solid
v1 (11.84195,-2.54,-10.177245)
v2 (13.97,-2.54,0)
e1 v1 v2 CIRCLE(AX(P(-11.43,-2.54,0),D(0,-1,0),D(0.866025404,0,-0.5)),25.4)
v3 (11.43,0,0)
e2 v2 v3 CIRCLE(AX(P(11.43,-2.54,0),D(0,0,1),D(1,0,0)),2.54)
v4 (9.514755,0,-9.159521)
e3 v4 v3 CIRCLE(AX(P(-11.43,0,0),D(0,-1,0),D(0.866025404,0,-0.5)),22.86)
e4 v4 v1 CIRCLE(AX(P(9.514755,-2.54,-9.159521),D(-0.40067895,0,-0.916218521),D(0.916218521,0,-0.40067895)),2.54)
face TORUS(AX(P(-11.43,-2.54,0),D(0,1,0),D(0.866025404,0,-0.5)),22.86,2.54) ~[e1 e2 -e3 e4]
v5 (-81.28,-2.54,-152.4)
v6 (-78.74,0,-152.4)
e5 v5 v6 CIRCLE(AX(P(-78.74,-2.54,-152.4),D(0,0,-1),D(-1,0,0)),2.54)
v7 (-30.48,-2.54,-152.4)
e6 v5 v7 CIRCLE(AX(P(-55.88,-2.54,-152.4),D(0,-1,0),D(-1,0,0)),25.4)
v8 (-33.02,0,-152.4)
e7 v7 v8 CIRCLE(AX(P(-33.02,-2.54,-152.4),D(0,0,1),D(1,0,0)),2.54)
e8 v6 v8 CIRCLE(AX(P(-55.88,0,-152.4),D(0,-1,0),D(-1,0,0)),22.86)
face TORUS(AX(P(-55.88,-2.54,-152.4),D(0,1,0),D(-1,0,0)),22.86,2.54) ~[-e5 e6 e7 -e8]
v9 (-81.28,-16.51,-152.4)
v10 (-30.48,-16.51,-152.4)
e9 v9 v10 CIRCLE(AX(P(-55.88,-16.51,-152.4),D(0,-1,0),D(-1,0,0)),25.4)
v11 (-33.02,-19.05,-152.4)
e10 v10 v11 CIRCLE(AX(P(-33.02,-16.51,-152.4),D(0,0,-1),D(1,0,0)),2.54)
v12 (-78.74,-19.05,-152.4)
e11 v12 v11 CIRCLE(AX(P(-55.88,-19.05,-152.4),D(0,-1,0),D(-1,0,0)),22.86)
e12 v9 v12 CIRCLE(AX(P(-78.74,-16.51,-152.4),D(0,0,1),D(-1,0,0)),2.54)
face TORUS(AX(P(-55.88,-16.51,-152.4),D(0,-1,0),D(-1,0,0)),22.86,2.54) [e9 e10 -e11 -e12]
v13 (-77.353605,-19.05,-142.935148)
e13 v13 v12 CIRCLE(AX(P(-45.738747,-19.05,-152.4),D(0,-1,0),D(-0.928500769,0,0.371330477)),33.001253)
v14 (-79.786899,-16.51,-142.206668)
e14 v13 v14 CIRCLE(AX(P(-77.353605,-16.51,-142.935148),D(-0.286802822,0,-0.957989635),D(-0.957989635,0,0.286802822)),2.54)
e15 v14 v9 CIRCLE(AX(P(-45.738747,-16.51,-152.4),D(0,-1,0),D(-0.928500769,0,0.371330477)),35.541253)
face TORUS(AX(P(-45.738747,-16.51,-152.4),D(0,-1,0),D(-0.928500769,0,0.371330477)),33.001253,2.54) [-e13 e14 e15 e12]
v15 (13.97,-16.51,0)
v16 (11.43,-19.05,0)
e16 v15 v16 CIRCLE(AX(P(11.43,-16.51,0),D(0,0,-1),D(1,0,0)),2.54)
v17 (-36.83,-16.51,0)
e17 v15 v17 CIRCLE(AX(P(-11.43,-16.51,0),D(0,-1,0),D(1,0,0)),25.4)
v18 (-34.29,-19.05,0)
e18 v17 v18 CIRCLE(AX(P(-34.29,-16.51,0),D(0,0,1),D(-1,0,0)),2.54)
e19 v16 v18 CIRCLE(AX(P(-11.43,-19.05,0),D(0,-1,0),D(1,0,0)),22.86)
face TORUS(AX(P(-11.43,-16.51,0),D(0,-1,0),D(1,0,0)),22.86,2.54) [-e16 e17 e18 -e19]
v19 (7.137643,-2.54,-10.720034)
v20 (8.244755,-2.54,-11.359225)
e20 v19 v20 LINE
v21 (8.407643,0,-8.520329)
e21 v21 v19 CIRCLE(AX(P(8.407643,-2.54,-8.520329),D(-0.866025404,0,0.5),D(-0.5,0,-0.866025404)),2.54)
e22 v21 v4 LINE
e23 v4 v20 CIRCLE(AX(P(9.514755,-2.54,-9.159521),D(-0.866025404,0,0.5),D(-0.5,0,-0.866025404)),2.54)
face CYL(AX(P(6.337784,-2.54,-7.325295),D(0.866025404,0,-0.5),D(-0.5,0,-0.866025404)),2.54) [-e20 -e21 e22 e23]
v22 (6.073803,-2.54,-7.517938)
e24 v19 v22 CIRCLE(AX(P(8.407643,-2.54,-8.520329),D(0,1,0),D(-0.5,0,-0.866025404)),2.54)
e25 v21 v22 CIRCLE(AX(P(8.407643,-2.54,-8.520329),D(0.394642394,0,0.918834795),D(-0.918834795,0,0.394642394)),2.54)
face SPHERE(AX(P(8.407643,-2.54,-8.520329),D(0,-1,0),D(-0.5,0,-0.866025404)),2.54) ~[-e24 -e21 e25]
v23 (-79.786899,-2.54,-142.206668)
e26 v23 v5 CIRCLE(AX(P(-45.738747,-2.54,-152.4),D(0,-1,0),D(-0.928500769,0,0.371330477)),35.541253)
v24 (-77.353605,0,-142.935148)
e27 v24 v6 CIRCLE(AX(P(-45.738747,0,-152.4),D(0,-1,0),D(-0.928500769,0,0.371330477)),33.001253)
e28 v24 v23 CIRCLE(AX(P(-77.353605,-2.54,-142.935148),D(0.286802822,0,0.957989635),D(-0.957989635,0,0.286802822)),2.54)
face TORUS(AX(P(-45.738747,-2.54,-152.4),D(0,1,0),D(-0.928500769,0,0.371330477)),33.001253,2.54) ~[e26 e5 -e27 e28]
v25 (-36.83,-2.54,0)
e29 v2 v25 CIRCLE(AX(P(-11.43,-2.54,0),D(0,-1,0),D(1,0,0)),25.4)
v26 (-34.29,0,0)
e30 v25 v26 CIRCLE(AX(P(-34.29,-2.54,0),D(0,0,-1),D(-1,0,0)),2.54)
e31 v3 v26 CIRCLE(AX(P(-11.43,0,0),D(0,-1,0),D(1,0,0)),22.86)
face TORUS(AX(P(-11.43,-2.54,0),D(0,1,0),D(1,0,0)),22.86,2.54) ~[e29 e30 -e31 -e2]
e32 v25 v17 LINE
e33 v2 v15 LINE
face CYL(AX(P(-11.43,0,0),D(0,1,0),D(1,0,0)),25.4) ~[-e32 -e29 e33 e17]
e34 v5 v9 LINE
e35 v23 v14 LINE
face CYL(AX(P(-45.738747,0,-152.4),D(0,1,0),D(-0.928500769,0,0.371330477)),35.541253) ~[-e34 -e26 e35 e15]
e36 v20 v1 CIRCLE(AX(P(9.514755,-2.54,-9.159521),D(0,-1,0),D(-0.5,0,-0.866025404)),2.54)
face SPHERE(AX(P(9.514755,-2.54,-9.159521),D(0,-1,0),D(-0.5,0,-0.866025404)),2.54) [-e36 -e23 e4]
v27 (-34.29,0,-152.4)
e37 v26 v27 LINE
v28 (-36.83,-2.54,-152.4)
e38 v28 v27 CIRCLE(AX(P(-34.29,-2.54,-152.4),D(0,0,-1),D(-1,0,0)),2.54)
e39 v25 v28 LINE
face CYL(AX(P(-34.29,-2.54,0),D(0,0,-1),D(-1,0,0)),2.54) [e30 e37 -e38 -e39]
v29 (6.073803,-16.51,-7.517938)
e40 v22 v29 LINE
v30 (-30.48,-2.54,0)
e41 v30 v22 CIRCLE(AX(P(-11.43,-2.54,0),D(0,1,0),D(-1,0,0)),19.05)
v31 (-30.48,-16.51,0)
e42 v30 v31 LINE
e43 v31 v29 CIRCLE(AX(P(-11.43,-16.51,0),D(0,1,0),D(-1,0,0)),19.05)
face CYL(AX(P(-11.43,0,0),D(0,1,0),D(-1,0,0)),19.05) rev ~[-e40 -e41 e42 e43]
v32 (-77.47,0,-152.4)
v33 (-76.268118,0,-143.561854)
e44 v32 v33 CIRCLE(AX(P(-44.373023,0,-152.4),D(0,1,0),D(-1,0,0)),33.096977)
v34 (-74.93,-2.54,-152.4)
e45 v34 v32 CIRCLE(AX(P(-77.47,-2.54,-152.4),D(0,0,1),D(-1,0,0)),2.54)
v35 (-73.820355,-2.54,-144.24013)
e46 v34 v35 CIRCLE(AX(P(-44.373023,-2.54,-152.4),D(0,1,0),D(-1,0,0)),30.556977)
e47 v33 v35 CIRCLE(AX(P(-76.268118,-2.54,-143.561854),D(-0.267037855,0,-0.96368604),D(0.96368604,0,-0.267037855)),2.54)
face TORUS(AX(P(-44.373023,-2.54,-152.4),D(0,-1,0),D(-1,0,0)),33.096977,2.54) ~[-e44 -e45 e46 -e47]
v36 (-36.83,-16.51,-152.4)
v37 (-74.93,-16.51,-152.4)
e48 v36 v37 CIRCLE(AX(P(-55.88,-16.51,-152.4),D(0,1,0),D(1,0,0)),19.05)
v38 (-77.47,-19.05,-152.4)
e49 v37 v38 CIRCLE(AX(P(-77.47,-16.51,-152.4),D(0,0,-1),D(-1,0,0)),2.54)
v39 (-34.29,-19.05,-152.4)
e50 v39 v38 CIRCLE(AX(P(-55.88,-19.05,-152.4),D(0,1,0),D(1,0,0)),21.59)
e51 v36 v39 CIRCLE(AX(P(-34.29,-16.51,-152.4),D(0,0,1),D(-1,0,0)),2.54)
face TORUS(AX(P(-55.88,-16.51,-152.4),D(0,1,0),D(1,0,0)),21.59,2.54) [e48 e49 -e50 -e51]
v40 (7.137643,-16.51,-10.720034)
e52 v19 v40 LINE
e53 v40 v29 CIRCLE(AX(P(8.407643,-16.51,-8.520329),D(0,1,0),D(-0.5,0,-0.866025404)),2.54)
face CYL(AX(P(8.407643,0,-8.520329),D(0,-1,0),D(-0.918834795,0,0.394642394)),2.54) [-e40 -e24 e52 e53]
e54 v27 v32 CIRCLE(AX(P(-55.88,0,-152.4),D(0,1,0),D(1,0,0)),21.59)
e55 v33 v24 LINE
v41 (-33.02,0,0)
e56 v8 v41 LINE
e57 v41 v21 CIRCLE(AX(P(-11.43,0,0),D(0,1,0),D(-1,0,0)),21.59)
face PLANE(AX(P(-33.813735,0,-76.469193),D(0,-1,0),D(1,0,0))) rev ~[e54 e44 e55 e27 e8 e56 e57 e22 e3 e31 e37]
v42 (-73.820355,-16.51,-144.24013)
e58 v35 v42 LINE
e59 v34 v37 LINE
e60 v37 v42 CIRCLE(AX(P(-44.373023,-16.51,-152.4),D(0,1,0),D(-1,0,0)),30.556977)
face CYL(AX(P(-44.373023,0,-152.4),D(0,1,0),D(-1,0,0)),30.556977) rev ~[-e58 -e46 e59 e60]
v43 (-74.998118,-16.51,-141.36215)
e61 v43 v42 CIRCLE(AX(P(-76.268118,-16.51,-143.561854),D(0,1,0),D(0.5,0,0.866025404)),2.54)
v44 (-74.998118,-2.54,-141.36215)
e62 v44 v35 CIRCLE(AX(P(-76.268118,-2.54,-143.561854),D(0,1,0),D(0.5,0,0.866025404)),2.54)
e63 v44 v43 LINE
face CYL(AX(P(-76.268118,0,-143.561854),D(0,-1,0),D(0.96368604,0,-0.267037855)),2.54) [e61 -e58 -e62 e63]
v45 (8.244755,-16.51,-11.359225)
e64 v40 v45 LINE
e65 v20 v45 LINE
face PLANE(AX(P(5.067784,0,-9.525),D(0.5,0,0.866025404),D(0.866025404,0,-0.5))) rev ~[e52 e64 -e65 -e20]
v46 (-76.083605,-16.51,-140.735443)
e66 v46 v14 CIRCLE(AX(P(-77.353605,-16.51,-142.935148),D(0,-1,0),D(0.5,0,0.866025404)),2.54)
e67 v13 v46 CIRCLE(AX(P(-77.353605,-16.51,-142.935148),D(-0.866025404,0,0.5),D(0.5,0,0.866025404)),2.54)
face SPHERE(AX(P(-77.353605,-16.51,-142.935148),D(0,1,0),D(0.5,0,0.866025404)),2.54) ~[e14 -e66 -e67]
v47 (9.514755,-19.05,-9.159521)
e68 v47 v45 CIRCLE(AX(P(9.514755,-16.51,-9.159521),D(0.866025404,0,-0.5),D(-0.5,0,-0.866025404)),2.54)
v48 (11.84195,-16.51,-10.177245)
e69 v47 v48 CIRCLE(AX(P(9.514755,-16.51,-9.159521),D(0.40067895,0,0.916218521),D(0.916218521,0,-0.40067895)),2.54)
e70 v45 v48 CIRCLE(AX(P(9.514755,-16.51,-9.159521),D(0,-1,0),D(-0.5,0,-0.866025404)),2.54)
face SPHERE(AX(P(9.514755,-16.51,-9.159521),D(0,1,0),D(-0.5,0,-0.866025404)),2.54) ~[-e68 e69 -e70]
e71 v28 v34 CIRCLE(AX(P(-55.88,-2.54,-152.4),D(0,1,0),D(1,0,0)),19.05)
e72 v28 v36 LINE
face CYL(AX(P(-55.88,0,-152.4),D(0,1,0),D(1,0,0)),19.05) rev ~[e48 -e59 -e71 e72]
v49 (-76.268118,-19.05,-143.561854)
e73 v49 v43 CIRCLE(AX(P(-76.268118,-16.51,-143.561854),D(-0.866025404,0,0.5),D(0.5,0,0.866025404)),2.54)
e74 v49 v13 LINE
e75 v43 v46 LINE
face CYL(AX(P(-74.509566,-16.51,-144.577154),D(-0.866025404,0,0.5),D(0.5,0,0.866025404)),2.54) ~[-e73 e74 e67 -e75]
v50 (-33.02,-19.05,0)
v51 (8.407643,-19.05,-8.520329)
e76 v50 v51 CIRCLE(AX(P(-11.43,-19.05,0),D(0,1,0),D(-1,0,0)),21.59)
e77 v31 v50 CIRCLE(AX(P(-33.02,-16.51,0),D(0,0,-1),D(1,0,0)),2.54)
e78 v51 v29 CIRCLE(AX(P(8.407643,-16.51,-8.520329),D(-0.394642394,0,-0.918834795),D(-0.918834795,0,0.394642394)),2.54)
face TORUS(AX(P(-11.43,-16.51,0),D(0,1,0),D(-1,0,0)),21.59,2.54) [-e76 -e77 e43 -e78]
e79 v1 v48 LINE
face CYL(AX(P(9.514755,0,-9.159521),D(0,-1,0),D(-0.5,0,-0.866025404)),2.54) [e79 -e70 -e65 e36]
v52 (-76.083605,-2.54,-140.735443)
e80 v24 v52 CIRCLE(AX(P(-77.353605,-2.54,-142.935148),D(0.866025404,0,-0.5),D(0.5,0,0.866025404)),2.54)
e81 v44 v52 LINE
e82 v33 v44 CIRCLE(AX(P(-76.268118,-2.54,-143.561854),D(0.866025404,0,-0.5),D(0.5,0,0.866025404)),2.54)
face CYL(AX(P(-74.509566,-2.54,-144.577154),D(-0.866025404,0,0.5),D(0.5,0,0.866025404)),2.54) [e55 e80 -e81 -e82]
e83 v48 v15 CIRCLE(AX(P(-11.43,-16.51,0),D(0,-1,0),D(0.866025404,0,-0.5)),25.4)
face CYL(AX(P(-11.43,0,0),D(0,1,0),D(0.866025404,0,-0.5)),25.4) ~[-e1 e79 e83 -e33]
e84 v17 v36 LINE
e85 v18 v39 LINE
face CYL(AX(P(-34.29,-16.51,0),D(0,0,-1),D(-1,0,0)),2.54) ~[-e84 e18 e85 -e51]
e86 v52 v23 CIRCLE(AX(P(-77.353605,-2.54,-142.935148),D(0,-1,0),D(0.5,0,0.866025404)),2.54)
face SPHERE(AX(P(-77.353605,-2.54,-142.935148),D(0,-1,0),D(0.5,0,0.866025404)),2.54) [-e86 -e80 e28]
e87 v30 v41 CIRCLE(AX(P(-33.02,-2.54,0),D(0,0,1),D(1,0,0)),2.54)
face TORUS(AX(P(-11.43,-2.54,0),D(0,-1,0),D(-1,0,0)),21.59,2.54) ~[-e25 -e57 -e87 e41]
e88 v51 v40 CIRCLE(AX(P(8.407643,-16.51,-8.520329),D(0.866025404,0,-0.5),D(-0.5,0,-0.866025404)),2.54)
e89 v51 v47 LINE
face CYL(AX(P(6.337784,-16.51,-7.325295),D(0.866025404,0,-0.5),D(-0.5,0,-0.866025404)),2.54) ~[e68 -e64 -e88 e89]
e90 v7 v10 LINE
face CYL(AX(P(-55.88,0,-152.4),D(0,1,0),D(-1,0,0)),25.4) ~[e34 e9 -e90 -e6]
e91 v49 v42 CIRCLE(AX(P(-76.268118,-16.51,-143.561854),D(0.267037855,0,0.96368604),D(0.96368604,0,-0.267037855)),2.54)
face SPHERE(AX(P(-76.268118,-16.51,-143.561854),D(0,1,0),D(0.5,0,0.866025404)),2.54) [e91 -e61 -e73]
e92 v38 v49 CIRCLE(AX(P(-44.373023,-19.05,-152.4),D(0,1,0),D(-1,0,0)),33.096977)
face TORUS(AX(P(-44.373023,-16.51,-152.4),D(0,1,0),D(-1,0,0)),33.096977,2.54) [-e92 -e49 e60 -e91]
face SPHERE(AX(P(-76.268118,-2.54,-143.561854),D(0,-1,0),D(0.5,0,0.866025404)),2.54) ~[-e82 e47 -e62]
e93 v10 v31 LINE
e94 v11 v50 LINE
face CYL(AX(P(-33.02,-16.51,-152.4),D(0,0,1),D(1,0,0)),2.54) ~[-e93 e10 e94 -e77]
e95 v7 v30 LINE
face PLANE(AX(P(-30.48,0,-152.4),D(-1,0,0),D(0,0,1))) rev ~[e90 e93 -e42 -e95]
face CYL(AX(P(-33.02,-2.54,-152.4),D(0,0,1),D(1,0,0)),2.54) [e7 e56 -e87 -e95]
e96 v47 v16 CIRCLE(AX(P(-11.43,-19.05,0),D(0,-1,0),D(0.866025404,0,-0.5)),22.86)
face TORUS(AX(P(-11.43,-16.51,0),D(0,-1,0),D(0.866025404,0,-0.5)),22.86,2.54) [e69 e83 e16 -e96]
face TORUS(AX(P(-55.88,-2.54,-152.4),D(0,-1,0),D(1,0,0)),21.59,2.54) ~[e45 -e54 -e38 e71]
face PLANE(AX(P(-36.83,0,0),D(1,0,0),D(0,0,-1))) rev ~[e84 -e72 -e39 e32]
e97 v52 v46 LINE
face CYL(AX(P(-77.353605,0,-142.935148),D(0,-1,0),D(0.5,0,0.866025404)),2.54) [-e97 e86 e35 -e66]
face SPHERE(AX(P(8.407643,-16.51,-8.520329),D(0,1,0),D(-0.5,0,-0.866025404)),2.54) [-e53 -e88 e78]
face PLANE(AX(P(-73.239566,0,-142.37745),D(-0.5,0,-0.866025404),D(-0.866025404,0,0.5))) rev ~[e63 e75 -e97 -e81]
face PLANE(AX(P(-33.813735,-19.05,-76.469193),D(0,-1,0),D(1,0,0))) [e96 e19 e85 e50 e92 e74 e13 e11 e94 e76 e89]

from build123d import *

# Parameters (mm, degrees)
F1_DEPTH = 19.05
F2_R     = 2.54


# Not quite as in the source:
# - a feature names something its author has since deleted; it is built from what else it names


with BuildPart() as f1:
    # F0 (on Front) → F1 (new body)
    with BuildSketch(Plane.XZ):
        with BuildLine():
            ThreePointArc((13.97, 0), (-11.43, 25.4), (-36.83, 0))
            Line((-36.83, 0), (-36.83, -152.4))
            ThreePointArc((-36.83, -152.4), (-55.88, -171.45), (-74.93, -152.4))
            ThreePointArc((-74.93, -152.4), (-74.5044281022, -147.3179462529), (-73.2395664242, -142.377449652))
            Line((-73.2395664242, -142.377449652), (-78.7388277382, -139.202449652))
            ThreePointArc((-78.7388277382, -139.202449652), (-80.638925247, -145.6800131761), (-81.28, -152.4))
            ThreePointArc((-81.28, -152.4), (-55.88, -177.8), (-30.48, -152.4))
            Line((-30.48, -152.4), (-30.48, 0))
            ThreePointArc((-30.48, 0), (-6.4994971908, 18.4008869908), (5.0677839421, -9.525))
            Line((5.0677839421, -9.525), (10.5670452561, -12.7))
            ThreePointArc((10.5670452561, -12.7), (13.1045159877, -6.5740037456), (13.97, 0))
        make_face()
    extrude(amount=F1_DEPTH)

    # F2
    f2_edges = [f1.edges().sort_by_distance(p)[0] for p in [
        (-73.239566, -9.525, -142.37745),
        (-78.738828, -9.525, -139.20245),
        (-75.989197, 0, -140.78995),
        (-75.989197, -19.05, -140.78995),
        (5.067784, -9.525, -9.525),
        (10.567045, -9.525, -12.7),
        (7.817415, 0, -11.1125),
        (7.817415, -19.05, -11.1125),
        (-55.88, 0, -177.8),
        (-30.48, 0, -76.2),
        (-6.499497, 0, 18.400887),
        (-4.855996, 0, 24.534516),
        (-36.83, 0, -76.2),
        (-55.88, 0, -171.45),
        (-74.504428, 0, -147.317946),
        (-80.638925, 0, -145.680013),
        (-55.88, -19.05, -177.8),
        (-30.48, -19.05, -76.2),
        (-6.499497, -19.05, 18.400887),
        (-4.855996, -19.05, 24.534516),
        (-36.83, -19.05, -76.2),
        (-55.88, -19.05, -171.45),
        (-74.504428, -19.05, -147.317946),
        (-80.638925, -19.05, -145.680013),
    ]]
    fillet(f2_edges, radius=F2_R)


solid = f1.part
